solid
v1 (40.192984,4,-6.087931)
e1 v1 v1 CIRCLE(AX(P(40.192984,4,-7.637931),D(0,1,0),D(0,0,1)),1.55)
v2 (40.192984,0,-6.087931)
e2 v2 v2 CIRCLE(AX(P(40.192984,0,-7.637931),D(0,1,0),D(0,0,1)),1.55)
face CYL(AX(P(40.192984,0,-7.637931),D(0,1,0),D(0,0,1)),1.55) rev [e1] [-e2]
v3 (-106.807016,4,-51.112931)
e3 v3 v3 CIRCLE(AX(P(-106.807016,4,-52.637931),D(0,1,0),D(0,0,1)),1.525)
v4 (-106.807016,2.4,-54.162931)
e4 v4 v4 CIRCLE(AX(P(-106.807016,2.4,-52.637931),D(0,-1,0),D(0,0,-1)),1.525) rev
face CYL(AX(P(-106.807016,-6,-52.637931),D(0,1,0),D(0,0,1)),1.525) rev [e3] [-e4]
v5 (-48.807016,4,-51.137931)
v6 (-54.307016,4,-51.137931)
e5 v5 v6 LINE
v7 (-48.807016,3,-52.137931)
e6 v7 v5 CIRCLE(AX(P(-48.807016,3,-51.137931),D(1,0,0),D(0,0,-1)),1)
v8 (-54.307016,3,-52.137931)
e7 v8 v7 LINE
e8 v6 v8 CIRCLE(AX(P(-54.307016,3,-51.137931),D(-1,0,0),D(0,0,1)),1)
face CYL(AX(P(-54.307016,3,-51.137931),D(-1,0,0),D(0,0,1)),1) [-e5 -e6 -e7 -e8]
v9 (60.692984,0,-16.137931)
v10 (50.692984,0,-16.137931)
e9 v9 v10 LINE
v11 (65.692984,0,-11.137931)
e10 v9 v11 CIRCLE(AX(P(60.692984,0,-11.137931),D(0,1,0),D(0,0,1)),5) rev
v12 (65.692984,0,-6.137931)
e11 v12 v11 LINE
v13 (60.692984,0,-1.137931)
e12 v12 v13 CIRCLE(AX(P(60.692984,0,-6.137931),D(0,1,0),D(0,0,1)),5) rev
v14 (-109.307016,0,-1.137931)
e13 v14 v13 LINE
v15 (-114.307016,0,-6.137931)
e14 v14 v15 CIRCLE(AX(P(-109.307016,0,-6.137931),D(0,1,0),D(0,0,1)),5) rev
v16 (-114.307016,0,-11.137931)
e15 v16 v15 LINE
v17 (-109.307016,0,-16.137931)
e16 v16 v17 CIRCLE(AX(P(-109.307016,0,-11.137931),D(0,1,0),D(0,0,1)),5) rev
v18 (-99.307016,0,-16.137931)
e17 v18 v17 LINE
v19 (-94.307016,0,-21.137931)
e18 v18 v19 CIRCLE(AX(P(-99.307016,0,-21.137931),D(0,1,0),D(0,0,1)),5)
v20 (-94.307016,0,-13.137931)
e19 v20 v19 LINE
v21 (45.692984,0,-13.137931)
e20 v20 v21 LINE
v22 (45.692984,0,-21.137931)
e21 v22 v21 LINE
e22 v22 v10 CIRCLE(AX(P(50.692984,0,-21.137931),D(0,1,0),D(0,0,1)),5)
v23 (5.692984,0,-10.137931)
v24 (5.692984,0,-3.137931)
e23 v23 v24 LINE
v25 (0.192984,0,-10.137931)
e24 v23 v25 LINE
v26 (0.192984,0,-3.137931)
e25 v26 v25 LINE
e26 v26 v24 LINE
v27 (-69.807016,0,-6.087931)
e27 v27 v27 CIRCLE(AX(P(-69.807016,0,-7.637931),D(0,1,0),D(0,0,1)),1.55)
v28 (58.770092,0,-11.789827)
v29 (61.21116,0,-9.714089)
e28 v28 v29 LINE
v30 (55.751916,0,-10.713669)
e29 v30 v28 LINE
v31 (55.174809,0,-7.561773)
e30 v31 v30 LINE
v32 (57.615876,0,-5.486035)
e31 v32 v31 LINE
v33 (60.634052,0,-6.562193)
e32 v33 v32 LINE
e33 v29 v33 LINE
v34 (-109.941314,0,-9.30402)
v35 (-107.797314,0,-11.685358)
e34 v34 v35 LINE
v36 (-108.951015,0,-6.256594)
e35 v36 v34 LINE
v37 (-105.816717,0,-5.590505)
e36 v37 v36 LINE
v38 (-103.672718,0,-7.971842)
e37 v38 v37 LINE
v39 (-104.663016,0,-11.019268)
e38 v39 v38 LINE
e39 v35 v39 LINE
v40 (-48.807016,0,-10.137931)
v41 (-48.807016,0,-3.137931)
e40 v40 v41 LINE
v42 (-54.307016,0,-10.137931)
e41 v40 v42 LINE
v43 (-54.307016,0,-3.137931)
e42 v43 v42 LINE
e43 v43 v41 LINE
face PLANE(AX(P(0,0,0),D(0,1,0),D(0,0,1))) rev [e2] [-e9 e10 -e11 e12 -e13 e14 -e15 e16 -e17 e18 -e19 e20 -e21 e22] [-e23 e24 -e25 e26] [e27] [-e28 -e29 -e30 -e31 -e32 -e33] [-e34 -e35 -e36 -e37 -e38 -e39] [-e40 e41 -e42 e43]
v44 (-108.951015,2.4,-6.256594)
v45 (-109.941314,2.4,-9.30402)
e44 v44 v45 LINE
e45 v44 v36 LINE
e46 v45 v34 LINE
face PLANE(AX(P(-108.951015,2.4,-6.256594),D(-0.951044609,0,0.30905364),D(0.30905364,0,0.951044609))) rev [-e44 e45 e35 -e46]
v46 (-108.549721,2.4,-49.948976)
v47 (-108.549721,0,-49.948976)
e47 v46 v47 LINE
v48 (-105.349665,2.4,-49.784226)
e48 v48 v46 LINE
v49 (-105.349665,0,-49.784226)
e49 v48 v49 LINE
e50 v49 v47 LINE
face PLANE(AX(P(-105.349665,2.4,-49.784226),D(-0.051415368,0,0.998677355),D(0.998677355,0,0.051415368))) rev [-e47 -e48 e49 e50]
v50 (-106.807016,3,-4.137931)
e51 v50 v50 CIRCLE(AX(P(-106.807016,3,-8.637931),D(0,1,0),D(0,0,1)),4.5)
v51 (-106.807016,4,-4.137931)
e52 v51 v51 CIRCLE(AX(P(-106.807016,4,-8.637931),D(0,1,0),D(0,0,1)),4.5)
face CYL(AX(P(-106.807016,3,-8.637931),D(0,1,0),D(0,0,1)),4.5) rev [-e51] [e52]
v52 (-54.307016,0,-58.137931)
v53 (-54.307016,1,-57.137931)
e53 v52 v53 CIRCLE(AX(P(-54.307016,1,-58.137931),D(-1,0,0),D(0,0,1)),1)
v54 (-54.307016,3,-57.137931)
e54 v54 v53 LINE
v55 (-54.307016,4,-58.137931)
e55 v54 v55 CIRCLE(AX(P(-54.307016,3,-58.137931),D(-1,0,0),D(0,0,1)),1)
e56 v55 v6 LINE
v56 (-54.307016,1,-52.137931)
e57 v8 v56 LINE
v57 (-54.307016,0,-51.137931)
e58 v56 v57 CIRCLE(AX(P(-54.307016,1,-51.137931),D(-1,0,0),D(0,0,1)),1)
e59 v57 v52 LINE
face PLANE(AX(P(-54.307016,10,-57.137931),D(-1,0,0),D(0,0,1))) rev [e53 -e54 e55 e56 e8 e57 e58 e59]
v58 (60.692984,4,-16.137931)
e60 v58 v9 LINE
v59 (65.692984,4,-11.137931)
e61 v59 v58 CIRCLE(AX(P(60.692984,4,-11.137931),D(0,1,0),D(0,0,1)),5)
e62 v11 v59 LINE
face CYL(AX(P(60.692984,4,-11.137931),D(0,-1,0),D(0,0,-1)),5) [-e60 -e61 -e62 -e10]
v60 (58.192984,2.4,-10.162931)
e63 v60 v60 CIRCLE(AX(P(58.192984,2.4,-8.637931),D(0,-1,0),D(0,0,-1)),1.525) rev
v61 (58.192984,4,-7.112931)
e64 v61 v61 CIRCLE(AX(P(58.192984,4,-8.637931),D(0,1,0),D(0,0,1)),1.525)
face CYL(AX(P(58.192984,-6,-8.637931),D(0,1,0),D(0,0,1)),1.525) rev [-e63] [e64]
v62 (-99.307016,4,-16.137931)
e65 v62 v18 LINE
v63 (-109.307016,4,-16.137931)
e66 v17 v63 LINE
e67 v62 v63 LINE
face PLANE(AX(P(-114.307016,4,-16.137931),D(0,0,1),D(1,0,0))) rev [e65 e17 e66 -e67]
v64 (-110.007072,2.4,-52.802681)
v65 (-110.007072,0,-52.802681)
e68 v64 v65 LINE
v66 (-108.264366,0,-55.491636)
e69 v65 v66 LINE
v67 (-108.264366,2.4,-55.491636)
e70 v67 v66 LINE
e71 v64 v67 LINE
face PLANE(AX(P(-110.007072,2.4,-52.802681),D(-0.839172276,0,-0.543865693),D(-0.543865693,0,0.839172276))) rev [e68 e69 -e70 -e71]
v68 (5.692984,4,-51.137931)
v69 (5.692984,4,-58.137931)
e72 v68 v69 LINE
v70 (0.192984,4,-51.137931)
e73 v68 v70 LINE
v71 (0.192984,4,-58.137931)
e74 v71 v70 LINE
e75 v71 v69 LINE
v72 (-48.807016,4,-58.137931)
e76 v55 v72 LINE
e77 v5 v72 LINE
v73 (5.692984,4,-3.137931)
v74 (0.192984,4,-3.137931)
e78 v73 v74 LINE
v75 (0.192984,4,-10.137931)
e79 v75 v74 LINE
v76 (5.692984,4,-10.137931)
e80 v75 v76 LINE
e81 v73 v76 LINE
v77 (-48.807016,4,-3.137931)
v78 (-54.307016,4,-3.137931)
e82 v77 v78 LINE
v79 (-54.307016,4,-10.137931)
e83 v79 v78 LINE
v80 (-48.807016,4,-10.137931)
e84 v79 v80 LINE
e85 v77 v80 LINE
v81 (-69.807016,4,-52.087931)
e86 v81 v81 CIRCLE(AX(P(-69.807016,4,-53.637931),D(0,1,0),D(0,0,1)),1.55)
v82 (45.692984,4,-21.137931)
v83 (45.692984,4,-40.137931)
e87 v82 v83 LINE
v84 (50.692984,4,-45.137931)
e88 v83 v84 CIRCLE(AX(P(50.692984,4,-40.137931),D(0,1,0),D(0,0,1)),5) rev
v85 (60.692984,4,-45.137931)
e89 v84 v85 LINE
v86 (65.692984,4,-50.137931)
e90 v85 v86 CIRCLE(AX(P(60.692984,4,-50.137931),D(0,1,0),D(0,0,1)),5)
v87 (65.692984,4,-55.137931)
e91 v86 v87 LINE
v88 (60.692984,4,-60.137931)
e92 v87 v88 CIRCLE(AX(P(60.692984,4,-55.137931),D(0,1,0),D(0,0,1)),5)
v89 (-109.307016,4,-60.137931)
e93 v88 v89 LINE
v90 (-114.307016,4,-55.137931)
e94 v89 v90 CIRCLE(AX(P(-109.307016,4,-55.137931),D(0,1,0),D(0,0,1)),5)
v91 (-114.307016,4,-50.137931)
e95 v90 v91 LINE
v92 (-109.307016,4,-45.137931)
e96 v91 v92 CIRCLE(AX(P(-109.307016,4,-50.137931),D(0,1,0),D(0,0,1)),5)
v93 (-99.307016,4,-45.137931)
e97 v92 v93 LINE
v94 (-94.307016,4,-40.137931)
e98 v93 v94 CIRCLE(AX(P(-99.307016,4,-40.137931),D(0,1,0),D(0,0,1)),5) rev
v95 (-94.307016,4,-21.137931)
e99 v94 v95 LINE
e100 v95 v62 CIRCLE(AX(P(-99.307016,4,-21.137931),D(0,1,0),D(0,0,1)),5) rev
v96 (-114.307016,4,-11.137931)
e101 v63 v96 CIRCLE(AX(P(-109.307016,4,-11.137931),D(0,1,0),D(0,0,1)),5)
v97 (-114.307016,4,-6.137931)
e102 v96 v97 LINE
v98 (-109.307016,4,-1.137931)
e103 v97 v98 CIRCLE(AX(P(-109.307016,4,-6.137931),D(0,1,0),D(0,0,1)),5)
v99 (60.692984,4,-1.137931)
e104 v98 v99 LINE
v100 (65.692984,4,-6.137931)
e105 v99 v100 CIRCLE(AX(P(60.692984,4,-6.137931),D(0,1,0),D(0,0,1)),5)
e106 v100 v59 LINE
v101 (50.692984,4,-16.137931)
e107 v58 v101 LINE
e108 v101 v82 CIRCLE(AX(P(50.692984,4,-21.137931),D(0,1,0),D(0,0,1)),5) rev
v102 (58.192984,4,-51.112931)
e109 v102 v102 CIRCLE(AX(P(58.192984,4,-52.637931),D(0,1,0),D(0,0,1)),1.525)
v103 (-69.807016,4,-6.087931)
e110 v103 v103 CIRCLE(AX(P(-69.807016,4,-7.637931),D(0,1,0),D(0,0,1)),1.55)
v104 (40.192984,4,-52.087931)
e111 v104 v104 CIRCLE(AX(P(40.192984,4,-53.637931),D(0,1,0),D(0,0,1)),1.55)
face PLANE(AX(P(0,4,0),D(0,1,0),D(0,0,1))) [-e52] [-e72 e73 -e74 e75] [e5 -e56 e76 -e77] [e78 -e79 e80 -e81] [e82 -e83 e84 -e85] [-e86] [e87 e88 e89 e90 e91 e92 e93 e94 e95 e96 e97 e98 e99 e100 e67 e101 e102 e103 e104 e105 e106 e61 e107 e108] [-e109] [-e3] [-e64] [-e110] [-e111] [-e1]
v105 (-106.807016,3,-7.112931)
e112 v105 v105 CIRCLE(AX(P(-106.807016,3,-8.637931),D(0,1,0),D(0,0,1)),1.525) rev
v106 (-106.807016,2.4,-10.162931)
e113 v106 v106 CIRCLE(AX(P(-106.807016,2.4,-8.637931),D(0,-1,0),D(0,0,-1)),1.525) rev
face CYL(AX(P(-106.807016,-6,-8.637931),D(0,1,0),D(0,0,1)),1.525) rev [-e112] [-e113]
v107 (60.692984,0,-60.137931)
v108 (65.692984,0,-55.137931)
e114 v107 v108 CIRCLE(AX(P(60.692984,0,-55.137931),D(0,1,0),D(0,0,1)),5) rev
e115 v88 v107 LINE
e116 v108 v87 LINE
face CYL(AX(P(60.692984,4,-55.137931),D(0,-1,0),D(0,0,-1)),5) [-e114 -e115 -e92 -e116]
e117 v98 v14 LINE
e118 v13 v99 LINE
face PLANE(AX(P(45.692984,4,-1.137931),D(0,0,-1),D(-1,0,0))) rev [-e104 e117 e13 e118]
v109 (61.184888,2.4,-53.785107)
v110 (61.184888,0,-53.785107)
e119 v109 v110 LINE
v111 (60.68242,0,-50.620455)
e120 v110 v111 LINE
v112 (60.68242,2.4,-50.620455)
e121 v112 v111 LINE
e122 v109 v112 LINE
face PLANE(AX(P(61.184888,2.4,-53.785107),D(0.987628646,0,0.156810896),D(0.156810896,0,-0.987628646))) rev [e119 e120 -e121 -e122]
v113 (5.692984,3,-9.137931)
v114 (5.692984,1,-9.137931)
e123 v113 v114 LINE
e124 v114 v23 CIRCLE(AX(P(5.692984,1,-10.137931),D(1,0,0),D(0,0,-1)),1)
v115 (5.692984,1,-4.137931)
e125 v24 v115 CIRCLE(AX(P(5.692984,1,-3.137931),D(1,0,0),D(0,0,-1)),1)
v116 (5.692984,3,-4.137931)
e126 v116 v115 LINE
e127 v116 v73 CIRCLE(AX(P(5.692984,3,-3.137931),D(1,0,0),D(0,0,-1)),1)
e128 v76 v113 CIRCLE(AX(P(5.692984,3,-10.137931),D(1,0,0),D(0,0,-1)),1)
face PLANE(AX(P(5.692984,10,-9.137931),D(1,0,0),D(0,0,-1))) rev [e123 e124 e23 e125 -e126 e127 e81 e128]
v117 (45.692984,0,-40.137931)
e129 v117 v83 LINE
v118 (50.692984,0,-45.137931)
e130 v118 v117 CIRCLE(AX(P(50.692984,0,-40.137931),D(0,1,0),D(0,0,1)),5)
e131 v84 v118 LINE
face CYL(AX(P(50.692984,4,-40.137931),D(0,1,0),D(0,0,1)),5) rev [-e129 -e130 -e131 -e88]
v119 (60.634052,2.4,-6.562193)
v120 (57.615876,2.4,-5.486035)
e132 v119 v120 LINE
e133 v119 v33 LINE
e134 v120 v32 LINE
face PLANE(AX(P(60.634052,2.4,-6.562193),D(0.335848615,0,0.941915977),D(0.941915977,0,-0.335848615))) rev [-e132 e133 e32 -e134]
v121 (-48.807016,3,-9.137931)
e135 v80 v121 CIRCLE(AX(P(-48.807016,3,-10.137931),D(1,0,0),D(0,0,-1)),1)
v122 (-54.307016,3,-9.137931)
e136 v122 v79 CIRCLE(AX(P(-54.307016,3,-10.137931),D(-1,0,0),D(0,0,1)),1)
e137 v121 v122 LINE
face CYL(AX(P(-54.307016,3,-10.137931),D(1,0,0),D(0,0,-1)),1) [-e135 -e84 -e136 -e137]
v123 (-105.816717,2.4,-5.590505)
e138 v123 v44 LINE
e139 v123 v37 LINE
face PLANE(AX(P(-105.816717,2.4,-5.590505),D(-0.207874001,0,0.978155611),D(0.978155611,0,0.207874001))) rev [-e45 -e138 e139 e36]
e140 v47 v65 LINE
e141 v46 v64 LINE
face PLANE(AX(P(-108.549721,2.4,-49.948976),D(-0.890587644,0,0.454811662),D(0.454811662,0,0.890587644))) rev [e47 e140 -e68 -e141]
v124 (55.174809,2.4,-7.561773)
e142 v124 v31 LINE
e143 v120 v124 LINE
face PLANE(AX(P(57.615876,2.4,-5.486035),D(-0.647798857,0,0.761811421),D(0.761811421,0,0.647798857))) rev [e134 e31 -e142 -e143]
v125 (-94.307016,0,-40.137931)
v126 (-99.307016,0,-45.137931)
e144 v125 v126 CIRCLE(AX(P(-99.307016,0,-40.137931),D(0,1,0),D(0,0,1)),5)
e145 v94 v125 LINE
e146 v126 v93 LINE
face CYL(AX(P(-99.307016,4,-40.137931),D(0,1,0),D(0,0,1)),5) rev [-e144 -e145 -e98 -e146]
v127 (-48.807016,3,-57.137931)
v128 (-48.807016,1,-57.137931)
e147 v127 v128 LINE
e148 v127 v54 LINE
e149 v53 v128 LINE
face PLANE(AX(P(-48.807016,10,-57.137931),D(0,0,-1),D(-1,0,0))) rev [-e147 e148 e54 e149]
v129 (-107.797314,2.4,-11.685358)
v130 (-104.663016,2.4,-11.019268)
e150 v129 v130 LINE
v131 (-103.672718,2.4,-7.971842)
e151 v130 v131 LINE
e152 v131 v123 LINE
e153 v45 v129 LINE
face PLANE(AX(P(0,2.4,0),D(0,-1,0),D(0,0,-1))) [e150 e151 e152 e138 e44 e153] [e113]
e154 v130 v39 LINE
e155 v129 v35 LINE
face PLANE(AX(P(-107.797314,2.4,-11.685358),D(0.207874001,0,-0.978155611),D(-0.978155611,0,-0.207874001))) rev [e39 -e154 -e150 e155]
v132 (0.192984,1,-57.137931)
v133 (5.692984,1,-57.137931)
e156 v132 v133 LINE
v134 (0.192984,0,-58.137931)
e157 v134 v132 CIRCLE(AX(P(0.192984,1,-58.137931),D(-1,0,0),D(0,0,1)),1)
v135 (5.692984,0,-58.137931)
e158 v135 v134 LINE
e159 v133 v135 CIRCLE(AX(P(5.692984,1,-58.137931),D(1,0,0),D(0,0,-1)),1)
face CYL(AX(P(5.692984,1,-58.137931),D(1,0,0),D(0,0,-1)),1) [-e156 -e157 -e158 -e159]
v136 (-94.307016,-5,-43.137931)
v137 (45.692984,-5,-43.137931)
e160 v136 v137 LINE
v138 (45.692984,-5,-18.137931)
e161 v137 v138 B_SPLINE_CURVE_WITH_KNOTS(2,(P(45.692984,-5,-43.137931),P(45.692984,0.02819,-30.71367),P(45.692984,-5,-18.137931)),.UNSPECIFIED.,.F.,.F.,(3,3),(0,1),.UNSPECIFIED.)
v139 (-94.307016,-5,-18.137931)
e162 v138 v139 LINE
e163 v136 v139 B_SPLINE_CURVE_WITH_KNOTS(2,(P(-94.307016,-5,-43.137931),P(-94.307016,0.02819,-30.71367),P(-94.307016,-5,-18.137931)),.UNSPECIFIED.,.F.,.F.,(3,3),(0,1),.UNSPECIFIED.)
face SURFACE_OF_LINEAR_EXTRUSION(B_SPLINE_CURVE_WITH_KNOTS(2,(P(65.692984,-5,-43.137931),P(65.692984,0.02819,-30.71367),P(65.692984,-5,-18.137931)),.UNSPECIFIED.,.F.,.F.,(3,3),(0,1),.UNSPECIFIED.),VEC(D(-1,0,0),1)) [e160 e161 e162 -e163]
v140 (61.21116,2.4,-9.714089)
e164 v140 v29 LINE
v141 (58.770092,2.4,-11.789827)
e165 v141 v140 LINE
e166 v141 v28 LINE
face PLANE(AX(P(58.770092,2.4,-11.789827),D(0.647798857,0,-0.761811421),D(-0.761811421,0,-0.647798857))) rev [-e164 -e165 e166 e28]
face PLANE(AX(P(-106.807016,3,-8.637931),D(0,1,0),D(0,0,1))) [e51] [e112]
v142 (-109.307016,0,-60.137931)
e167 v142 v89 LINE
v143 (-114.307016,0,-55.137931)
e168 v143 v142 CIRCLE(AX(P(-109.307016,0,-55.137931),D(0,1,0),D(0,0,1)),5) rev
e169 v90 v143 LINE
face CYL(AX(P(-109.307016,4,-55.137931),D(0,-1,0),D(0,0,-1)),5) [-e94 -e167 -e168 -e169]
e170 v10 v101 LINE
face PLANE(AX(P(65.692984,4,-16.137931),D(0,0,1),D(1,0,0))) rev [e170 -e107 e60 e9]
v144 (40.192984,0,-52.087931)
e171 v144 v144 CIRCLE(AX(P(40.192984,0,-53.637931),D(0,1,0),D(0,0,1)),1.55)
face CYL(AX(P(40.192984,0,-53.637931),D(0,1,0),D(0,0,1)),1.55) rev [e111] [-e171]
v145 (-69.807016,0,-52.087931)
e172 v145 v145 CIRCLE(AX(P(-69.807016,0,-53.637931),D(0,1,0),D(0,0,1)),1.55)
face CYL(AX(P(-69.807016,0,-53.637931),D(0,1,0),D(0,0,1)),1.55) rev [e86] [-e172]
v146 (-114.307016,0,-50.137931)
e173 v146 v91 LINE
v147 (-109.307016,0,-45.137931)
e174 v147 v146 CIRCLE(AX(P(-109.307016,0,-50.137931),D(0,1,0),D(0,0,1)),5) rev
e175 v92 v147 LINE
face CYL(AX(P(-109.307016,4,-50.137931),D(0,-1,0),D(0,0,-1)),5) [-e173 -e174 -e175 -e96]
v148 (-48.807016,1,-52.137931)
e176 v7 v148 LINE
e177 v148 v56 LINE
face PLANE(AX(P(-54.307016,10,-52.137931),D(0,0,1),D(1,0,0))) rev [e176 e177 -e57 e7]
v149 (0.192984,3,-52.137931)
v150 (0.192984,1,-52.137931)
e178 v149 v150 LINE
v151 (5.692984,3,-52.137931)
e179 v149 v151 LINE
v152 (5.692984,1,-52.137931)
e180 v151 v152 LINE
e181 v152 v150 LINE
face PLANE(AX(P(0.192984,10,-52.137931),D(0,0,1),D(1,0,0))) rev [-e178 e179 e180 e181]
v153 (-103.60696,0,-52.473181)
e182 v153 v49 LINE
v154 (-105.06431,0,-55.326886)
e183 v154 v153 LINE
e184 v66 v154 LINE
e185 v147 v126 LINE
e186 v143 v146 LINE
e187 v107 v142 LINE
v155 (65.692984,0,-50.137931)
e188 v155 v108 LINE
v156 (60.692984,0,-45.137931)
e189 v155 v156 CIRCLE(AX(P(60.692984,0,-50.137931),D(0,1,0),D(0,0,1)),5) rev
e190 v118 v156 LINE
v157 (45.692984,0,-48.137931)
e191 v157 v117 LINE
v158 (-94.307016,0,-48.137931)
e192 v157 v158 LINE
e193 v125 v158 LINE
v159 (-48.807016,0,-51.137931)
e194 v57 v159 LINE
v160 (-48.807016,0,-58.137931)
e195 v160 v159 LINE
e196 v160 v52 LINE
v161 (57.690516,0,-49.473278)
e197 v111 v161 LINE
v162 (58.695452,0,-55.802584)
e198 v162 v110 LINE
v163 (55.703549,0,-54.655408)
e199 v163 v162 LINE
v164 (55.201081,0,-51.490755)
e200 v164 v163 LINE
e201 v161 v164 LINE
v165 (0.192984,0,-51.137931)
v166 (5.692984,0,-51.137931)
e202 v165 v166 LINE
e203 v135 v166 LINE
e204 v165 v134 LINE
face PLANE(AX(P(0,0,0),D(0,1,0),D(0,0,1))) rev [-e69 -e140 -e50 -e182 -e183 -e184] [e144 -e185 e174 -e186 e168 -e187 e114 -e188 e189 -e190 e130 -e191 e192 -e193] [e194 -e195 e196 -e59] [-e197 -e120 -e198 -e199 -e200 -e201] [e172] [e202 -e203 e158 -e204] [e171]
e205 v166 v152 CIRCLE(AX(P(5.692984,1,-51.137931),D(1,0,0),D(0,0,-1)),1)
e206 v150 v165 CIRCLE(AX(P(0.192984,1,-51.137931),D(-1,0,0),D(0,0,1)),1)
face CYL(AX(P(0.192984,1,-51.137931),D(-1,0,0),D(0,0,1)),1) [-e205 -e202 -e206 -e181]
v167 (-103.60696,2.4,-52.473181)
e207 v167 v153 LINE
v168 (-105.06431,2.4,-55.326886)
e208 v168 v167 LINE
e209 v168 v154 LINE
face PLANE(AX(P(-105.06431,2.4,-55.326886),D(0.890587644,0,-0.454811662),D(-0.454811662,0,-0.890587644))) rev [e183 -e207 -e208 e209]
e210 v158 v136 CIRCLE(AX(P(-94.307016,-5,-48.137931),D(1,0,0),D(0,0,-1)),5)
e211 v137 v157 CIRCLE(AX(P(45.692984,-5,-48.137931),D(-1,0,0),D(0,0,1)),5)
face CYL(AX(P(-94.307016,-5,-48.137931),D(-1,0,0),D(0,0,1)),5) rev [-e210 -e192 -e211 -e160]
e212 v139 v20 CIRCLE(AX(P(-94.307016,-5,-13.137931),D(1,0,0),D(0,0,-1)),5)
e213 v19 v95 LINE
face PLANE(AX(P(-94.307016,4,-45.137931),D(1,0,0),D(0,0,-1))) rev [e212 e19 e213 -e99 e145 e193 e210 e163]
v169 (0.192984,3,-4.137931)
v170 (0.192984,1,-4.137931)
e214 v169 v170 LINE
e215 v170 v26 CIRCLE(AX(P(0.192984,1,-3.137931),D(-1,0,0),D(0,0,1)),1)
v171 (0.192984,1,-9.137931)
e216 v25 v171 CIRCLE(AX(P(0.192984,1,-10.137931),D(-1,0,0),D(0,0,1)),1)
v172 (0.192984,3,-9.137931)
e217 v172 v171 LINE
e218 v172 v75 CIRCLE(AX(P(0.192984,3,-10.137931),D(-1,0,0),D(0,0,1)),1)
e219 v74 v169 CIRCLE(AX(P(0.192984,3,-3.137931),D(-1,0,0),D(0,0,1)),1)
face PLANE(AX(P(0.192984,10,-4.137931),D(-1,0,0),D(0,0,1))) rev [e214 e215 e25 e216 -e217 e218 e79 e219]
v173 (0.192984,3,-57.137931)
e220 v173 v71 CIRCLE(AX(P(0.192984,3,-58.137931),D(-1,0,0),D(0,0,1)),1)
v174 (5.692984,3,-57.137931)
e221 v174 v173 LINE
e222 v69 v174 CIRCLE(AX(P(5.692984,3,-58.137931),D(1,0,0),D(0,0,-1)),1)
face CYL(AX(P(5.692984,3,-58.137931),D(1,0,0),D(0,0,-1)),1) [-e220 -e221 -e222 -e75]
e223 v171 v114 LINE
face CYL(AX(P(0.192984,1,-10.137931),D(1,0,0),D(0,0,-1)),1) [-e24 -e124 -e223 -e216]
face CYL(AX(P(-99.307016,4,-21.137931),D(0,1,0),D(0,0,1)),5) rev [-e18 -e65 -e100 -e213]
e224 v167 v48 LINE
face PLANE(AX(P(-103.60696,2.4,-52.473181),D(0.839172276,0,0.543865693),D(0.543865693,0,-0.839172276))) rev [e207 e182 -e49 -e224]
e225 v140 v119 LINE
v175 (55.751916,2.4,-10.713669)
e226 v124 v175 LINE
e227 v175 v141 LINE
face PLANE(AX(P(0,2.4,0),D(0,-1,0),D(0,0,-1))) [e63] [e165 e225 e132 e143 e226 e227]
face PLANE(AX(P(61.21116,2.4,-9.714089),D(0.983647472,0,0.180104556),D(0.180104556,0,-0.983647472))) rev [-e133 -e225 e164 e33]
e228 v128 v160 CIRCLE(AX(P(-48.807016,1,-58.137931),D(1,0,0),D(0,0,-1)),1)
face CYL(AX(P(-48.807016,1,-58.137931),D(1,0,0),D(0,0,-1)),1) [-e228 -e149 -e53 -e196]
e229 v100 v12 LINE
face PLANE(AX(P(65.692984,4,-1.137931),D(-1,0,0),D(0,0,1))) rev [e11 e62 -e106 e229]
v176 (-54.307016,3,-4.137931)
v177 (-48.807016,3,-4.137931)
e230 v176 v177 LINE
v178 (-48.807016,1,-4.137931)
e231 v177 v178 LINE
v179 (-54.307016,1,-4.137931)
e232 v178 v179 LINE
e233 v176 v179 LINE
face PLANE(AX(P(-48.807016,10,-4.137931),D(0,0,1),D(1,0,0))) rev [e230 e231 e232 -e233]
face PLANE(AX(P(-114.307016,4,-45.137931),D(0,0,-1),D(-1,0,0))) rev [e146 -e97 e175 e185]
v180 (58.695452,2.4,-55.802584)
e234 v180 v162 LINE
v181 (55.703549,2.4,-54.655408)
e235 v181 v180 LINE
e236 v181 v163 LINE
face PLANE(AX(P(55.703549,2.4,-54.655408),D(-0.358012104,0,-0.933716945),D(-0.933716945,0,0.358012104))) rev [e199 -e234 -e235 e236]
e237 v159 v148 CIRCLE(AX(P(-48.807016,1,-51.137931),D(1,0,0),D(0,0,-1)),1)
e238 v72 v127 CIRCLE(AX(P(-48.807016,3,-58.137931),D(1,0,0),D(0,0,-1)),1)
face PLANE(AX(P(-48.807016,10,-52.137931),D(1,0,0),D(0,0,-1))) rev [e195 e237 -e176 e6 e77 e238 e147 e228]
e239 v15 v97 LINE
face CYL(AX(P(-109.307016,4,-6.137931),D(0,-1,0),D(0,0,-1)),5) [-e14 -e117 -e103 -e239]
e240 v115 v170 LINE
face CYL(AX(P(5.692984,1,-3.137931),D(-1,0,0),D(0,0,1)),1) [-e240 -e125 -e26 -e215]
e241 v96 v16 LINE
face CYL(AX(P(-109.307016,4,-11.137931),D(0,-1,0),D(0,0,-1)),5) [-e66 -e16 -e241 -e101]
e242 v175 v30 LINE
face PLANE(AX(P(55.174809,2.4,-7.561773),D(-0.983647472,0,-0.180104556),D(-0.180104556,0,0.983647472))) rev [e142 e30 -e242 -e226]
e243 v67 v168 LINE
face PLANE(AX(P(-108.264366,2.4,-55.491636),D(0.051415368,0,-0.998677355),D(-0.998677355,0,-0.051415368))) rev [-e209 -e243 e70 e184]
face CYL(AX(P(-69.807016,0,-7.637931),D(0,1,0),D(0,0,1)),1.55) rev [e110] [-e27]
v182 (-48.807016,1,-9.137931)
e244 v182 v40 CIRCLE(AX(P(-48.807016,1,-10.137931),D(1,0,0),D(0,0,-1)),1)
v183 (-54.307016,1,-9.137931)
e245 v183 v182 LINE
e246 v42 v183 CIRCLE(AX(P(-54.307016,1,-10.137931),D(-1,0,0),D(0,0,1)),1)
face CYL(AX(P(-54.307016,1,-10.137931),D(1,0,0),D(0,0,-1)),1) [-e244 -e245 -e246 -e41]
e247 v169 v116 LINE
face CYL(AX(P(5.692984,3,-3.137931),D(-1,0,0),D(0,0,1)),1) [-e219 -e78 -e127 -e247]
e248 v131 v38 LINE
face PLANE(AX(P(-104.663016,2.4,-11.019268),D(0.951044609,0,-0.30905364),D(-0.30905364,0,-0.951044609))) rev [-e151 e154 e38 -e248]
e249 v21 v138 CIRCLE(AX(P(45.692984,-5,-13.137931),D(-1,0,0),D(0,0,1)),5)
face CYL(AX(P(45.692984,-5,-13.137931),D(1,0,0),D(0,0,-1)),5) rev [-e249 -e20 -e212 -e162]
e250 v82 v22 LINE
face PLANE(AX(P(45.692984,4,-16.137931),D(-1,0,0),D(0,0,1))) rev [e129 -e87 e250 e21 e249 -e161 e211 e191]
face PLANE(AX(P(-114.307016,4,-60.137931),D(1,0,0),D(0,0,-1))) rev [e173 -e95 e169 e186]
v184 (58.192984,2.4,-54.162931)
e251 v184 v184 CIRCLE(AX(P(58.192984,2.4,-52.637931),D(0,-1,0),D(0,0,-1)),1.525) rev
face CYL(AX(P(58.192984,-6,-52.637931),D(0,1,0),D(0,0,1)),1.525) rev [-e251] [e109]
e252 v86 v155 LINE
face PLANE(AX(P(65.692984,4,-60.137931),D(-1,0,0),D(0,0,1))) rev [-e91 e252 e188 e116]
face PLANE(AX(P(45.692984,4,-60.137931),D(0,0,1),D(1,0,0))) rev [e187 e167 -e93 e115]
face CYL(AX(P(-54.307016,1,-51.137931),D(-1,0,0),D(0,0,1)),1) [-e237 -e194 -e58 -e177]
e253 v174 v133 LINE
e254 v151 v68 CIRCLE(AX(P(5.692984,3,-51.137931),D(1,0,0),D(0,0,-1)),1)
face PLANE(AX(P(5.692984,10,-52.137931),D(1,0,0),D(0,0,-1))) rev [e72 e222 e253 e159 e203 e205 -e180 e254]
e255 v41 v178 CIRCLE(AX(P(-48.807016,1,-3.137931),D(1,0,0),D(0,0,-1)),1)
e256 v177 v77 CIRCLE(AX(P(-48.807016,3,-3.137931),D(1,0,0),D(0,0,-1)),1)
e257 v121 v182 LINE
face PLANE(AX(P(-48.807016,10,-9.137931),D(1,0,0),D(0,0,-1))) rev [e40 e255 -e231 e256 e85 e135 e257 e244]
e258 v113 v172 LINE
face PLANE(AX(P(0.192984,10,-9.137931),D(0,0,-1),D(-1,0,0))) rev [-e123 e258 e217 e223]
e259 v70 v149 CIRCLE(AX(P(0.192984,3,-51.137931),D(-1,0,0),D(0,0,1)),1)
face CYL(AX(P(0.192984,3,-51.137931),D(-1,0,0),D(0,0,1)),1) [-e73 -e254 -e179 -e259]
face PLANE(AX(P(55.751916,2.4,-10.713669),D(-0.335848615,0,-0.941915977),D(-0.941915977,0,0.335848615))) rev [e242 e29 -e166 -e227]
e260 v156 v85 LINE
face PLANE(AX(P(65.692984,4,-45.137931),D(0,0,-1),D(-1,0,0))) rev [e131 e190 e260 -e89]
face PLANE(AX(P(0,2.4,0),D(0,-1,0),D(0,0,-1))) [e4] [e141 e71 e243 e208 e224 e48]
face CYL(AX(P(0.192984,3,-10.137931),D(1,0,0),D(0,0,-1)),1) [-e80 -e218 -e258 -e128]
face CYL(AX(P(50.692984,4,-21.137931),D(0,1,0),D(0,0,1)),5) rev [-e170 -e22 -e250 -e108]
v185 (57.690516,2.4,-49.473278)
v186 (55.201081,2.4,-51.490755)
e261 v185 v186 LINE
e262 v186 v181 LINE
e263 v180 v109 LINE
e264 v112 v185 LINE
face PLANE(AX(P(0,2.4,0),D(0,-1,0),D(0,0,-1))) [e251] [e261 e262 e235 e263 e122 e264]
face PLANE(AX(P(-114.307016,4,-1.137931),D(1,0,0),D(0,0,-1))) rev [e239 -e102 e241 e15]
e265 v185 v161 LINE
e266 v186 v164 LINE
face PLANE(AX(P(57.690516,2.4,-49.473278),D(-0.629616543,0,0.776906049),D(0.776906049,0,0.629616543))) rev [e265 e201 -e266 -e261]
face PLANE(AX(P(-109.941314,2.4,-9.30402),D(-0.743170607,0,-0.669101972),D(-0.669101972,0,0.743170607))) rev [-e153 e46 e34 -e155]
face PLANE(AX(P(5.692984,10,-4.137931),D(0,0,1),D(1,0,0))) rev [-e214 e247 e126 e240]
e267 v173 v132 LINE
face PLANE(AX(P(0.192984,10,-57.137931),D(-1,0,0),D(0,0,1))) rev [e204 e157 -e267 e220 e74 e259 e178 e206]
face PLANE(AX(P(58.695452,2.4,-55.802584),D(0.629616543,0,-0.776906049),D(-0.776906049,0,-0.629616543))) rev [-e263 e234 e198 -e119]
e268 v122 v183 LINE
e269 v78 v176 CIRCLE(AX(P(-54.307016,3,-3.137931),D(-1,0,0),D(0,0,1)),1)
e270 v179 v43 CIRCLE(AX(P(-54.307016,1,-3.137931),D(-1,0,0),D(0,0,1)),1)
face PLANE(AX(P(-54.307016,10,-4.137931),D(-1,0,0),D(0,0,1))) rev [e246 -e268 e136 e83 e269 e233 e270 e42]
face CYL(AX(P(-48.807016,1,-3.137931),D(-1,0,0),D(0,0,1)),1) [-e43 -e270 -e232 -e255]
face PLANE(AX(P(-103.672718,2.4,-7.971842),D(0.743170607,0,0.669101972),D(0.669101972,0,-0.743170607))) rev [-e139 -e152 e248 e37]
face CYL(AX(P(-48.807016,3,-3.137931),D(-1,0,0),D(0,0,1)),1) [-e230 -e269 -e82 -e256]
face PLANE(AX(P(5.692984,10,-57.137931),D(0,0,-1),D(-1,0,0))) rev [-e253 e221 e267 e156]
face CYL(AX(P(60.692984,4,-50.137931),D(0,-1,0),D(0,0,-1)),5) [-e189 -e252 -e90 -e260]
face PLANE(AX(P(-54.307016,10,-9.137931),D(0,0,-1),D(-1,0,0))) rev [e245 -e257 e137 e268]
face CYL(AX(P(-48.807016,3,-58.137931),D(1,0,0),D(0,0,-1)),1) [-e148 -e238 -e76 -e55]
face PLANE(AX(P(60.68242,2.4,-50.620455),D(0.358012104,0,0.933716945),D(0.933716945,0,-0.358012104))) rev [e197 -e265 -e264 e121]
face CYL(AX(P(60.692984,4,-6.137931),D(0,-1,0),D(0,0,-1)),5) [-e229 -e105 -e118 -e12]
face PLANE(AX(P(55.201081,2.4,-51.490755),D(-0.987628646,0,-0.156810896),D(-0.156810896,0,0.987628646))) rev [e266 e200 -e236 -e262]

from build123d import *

# Parameters (mm, degrees)
BOSS_EXTRUDE1_DEPTH = 4
SKETCH2_R           = 1.55
CUT_EXTRUDE3_DEPTH  = 130.223312929
FILLET1_R           = 5
SKETCH5_R           = 1.525
CUT_EXTRUDE4_DEPTH  = 10
SKETCH5_3_R         = 4.5
CUT_EXTRUDE5_DEPTH  = 1
CUT_EXTRUDE6_DEPTH  = 2.4
SKETCH8_W           = 140
SKETCH8_H           = 25
BOSS_EXTRUDE4_DEPTH = 5
CUT_EXTRUDE7_DEPTH  = 186.792392805
FILLET5_R           = 5
SKETCH12_W          = 5.5
SKETCH12_H          = 5
CUT_EXTRUDE8_DEPTH  = 10
FILLET6_R           = 1


with BuildPart() as part:
    # Sketch1 → Boss-Extrude1 (new body)
    with BuildSketch(Plane(origin=(0, 0, 0), x_dir=(1, 0, 0), z_dir=(0, 1, 0))):
        Polygon((-94.307015775, 45.137931034), (-94.307015775, 16.137931034), (-114.307015775, 16.137931034), (-114.307015775, 1.137931034), (-68.307015775, 1.137931034), (45.692984225, 1.137931034), (65.692984225, 1.137931034), (65.692984225, 16.137931034), (45.692984225, 16.137931034), (45.692984225, 45.137931034), (65.692984225, 45.137931034), (65.692984225, 60.137931034), (45.692984225, 60.137931034), (-68.307015775, 60.137931034), (-114.307015775, 60.137931034), (-114.307015775, 45.137931034), align=None)
    extrude(amount=BOSS_EXTRUDE1_DEPTH)

    # Sketch2 → Cut-Extrude3 (cut, through all)
    with BuildSketch(Plane(origin=(0, 4, 0), x_dir=(1, 0, 0), z_dir=(0, 1, 0))):
        with Locations(Location((40.192984225, 53.637931034, 0), (0, 0, 270))):
            Circle(SKETCH2_R)
        with Locations(Location((-69.807015775, 53.637931034, 0), (0, 0, 270))):
            Circle(SKETCH2_R)
        with Locations(Location((-69.807015775, 7.637931034, 0), (0, 0, 270))):
            Circle(SKETCH2_R)
        with Locations(Location((40.192984225, 7.637931034, 0), (0, 0, 270))):
            Circle(SKETCH2_R)
    extrude(amount=-CUT_EXTRUDE3_DEPTH, mode=Mode.SUBTRACT)

    # Fillet1
    fillet1_edges = [part.edges().sort_by_distance(p)[0] for p in [
        (65.692984225, 2, -60.137931034),
        (65.692984225, 2, -45.137931034),
        (45.692984225, 2, -45.137931034),
        (45.692984225, 2, -16.137931034),
        (65.692984225, 2, -16.137931034),
        (65.692984225, 2, -1.137931034),
        (-114.307015775, 2, -1.137931034),
        (-114.307015775, 2, -16.137931034),
        (-94.307015775, 2, -16.137931034),
        (-94.307015775, 2, -45.137931034),
        (-114.307015775, 2, -45.137931034),
        (-114.307015775, 2, -60.137931034),
    ]]
    fillet(fillet1_edges, radius=FILLET1_R)

    # Sketch5 → Cut-Extrude4 (cut)
    with BuildSketch(Plane(origin=(0, 4, 0), x_dir=(1, 0, 0), z_dir=(0, 1, 0))):
        with Locations(Location((-106.807015775, 52.637931034, 0), (0, 0, 270))):
            Circle(SKETCH5_R)
        with Locations(Location((-106.807015775, 8.637931034, 0), (0, 0, 270))):
            Circle(SKETCH5_R)
        with Locations(Location((58.192984225, 8.637931034, 0), (0, 0, 270))):
            Circle(SKETCH5_R)
        with Locations(Location((58.192984225, 52.637931034, 0), (0, 0, 270))):
            Circle(SKETCH5_R)
    extrude(amount=-CUT_EXTRUDE4_DEPTH, mode=Mode.SUBTRACT)

    # Sketch5<3> → Cut-Extrude5 (cut)
    with BuildSketch(Plane(origin=(0, 4, 0), x_dir=(1, 0, 0), z_dir=(0, 1, 0))):
        with Locations(Location((-106.807015775, 8.637931034, 0), (0, 0, 270))):
            Circle(SKETCH5_3_R)
    extrude(amount=-CUT_EXTRUDE5_DEPTH, mode=Mode.SUBTRACT)

    # Sketch6 → Cut-Extrude6 (cut)
    with BuildSketch(Plane.XZ):
        Polygon((-104.663016346, -11.019268148), (-103.672717625, -7.97184162), (-105.816717054, -5.590504507), (-108.951015204, -6.256593921), (-109.941313925, -9.304020449), (-107.797314496, -11.685357562), align=None)
        Polygon((58.770092174, -11.789826721), (61.211159934, -9.714088733), (60.634051985, -6.562193047), (57.615876277, -5.486035348), (55.174808517, -7.561773336), (55.751916465, -10.713669022), align=None)
        Polygon((60.682419613, -50.620454529), (57.690516013, -49.473278495), (55.201080626, -51.490755001), (55.703548838, -54.65540754), (58.695452437, -55.802583574), (61.184887825, -53.785107068), align=None)
        Polygon((-103.606959923, -52.473181078), (-105.349665496, -49.784226396), (-108.549721348, -49.948976352), (-110.007071626, -52.802680991), (-108.264366053, -55.491635673), (-105.064310202, -55.326885717), align=None)
    extrude(amount=-CUT_EXTRUDE6_DEPTH, mode=Mode.SUBTRACT)

    # Sketch8 → Boss-Extrude4 (add)
    with BuildSketch(Plane.XZ):
        with Locations((-24.307015775, -30.637931034)):
            Rectangle(SKETCH8_W, SKETCH8_H)
    extrude(amount=BOSS_EXTRUDE4_DEPTH)

    # Sketch9 → Cut-Extrude7 (cut, through all)
    with BuildSketch(Plane(origin=(-94.307015775, 0, -95.444946809), x_dir=(0, 0, -1), z_dir=(1, 0, 0))):
        with BuildLine():
            Line((-52.307015775, -5), (-77.307015775, -5))
            add(Edge.make_bspline(
                [(-52.307015775, -5), (-64.731276491, 0.028189696), (-77.307015775, -5)],
                knots=[0, 0, 0, 1, 1, 1], degree=2))
        make_face()
    extrude(amount=CUT_EXTRUDE7_DEPTH, mode=Mode.SUBTRACT)

    # Fillet5
    fillet5_edges = [part.edges().sort_by_distance(p)[0] for p in [
        (-24.307015775, 0, -43.137931034),
        (-24.307015775, 0, -18.137931034),
    ]]
    fillet(fillet5_edges, radius=FILLET5_R - 0.0001)  # a hair under: the kernel refuses the full size

    # Sketch12 → Cut-Extrude8 (cut)
    with BuildSketch(Plane.XZ):
        with Locations((-51.557015775, -6.637931034)):
            Rectangle(SKETCH12_W, SKETCH12_H)
        with Locations((2.942984225, -6.637931034)):
            Rectangle(SKETCH12_W, SKETCH12_H)
        with Locations((2.942984225, -54.637931034)):
            Rectangle(SKETCH12_W, SKETCH12_H)
        with Locations((-51.557015775, -54.637931034)):
            Rectangle(SKETCH12_W, SKETCH12_H)
    extrude(amount=-CUT_EXTRUDE8_DEPTH, mode=Mode.SUBTRACT)

    # Fillet6
    fillet6_edges = [part.edges().sort_by_distance(p)[0] for p in [
        (-51.557015775, 4, -9.137931034),
        (-51.557015775, 4, -4.137931034),
        (-51.557015775, 0, -9.137931034),
        (-51.557015775, 0, -4.137931034),
        (-51.557015775, 4, -52.137931034),
        (-51.557015775, 4, -57.137931034),
        (2.942984225, 4, -52.137931034),
        (2.942984225, 4, -57.137931034),
        (2.942984225, 4, -9.137931034),
        (2.942984225, 4, -4.137931034),
        (2.942984225, 0, -4.137931034),
        (2.942984225, 0, -9.137931034),
        (2.942984225, 0, -52.137931034),
        (2.942984225, 0, -57.137931034),
        (-51.557015775, 0, -57.137931034),
        (-51.557015775, 0, -52.137931034),
    ]]
    fillet(fillet6_edges, radius=FILLET6_R)


solid = part.part
